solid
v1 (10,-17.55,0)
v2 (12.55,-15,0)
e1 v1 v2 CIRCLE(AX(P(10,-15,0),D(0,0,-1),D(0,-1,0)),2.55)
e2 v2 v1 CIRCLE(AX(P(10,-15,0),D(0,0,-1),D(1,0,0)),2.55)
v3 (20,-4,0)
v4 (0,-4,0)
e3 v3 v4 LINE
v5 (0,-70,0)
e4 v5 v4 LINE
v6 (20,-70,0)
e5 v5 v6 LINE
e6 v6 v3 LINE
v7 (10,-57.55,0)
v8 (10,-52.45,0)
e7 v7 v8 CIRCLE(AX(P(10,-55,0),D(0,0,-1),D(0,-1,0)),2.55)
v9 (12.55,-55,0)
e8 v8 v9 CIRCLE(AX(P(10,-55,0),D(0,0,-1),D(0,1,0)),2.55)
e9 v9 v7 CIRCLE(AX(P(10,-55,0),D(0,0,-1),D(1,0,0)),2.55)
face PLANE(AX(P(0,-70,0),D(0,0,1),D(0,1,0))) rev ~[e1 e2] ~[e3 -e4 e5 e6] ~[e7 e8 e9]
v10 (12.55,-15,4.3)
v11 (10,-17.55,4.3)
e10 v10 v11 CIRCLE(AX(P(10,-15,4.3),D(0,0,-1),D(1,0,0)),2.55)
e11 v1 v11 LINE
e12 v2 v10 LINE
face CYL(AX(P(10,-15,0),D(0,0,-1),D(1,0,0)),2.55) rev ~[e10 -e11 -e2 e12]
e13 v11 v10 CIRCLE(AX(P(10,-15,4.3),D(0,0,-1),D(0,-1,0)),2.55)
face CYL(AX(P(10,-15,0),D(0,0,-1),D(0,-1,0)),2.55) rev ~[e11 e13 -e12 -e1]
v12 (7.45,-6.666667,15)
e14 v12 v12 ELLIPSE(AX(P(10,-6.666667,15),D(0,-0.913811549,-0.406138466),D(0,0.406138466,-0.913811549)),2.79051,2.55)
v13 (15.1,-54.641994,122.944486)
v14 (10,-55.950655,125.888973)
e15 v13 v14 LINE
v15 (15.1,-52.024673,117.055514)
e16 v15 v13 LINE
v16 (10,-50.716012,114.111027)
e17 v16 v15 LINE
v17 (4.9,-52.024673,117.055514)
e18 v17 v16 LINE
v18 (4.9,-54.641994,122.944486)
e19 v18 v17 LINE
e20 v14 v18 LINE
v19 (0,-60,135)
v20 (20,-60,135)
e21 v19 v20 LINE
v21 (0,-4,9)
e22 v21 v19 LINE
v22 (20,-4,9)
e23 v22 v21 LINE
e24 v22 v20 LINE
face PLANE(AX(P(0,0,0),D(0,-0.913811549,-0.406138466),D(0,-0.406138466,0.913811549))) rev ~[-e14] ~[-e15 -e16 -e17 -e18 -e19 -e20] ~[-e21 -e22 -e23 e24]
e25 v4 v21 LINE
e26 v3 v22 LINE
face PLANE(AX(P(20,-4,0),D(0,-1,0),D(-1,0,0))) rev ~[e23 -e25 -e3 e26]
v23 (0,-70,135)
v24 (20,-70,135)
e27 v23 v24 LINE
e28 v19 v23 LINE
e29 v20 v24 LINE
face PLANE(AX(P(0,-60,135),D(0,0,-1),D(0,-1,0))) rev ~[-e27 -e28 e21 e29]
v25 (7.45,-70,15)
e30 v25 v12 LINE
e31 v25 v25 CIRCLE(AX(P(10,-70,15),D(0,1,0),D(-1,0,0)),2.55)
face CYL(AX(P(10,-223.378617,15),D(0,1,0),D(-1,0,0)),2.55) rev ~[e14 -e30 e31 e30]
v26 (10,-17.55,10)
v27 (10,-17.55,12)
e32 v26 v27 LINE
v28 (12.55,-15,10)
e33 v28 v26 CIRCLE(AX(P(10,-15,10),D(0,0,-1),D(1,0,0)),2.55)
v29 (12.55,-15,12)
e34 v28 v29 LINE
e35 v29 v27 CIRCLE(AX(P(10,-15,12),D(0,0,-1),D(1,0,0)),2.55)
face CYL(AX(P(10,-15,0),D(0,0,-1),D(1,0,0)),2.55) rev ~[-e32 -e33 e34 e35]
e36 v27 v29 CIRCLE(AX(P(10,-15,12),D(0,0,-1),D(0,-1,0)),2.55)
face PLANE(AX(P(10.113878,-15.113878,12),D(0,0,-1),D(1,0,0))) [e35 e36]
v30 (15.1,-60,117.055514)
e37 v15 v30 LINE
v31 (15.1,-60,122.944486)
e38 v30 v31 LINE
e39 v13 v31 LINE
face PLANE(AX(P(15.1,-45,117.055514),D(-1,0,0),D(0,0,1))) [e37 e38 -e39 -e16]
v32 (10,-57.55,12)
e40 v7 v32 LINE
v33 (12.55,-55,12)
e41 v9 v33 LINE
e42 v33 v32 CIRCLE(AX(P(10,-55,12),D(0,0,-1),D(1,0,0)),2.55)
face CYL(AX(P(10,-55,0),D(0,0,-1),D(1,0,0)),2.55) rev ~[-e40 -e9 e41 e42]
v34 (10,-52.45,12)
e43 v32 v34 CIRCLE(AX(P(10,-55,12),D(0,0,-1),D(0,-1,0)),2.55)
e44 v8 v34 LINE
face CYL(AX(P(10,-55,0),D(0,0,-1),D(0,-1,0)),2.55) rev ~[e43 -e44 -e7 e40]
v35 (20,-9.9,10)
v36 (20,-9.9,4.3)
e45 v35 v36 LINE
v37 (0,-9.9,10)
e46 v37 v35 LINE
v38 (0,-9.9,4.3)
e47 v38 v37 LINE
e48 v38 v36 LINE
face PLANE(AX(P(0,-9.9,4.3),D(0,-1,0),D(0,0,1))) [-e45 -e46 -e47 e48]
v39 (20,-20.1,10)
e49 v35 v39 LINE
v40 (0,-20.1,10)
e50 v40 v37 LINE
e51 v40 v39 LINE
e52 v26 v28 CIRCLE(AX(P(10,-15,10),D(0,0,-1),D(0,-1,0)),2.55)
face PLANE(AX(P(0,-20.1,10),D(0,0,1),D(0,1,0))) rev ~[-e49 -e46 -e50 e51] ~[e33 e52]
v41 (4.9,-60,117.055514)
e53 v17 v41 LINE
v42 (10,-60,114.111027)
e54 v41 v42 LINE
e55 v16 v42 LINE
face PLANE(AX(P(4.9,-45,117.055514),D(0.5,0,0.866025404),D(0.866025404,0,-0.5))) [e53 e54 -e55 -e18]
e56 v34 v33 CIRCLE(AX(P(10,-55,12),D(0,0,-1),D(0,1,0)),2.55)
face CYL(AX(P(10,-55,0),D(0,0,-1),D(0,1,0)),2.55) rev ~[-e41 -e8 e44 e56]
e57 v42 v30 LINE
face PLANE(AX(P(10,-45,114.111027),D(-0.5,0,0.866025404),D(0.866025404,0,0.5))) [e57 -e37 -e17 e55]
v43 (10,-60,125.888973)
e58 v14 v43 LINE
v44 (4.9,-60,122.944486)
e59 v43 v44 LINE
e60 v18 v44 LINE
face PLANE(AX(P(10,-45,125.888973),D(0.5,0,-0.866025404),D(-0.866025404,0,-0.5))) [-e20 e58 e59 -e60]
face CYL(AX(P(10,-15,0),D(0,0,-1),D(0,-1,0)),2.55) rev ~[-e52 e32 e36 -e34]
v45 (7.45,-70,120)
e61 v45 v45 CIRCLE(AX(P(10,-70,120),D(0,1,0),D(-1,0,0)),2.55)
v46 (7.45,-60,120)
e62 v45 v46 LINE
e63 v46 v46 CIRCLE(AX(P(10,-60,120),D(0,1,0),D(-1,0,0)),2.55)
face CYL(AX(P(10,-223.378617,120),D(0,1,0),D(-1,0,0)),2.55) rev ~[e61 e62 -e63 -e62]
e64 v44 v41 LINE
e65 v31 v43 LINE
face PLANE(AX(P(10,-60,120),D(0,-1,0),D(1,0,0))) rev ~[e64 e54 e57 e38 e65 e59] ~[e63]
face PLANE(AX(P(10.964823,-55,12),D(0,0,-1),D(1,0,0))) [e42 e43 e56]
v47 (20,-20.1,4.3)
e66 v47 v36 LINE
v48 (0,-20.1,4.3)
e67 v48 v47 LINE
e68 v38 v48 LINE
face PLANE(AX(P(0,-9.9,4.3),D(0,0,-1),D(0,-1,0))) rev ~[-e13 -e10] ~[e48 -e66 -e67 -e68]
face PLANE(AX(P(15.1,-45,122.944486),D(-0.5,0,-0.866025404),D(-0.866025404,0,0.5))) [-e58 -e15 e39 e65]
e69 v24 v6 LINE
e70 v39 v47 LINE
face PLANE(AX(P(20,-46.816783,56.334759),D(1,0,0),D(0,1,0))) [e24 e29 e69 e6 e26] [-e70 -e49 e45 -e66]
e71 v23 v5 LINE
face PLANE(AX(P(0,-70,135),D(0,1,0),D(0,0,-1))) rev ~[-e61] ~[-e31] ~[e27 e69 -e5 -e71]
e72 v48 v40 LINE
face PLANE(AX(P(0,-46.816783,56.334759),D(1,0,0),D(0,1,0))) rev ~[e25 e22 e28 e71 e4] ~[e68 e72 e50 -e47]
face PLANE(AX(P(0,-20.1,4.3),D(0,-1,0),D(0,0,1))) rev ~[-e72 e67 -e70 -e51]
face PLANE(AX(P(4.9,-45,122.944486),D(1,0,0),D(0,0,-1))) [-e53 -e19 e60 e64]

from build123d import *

# Parameters (mm, degrees)
F1_DEPTH  = 20
F3_D      = 5.1
F5_DEPTH  = 12
F6_DEPTH  = 25
F7_DEPTH  = 15
F8_D      = 5.1
F9_W      = 5.1
F9_H      = 5.7
F10_DEPTH = 25
F4_W      = 10
F4_H      = 4
F11_DEPTH = 25


# Not quite as in the source:
# - a feature names something its author has since deleted; it is built from what else it names


with BuildPart() as f1:
    # F0 (on Right) → F1 (new body)
    with BuildSketch(Plane.YZ):
        Polygon((-70, 0), (0, 0), (-60, 135), (-70, 135), align=None)
    extrude(amount=F1_DEPTH)

    # F3 (through all)
    with Locations(Plane.XZ.offset(70)):
        with Locations((10, 15), (10, 120)):
            Hole(F3_D / 2)

    # F4 (on face) → F5 (cut)
    with BuildSketch(Plane(origin=(0, 0, 0), x_dir=(1, 0, 0), z_dir=(0, 0, -1))):
        with BuildLine():
            ThreePointArc((12.55, 55), (11.803122292, 56.803122292), (10, 57.55))
            Line((10, 57.55), (10, 55))
            Line((10, 55), (10, 52.45))
            ThreePointArc((10, 52.45), (11.803122292, 53.196877708), (12.55, 55))
        make_face()
        with BuildLine():
            ThreePointArc((12.55, 15), (11.803122292, 16.803122292), (10, 17.55))
            ThreePointArc((10, 17.55), (8.196877708, 13.196877708), (12.55, 15))
        make_face()
        with BuildLine():
            Line((10, 55), (10, 57.55))
            ThreePointArc((10, 57.55), (7.45, 55), (10, 52.45))
            Line((10, 52.45), (10, 55))
        make_face()
    extrude(amount=-F5_DEPTH, mode=Mode.SUBTRACT)

    # F2 (on face) → F6 (join)
    with BuildSketch(Plane.XZ.offset(70)):
        Polygon((15.1, 122.9444863729), (10, 125.8889727457), (4.9, 122.9444863729), (4.9, 117.0555136271), (10, 114.1110272543), (15.1, 117.0555136271), align=None)
    extrude(amount=-F6_DEPTH)

    # F7 (cut): a face of the model
    f7_faces = [f1.faces().sort_by_distance(p)[0] for p in [
        (10, -45, 120),
    ]]
    extrude(f7_faces, amount=-F7_DEPTH, mode=Mode.SUBTRACT)

    # F8 (through all)
    with Locations(Plane.XZ.offset(70)):
        with Locations((10, 120)):
            Hole(F8_D / 2)

    # F9 (on face) → F10 (cut)
    with BuildSketch(Plane(origin=(0, 0, 0), x_dir=(0, -1, 0), z_dir=(-1, 0, 0))):
        with Locations((12.45, 7.15)):
            Rectangle(F9_W, F9_H)
        with Locations((17.55, 7.15)):
            Rectangle(F9_W, F9_H)
    extrude(amount=-F10_DEPTH, mode=Mode.SUBTRACT)

    # F4 (on face) → F11 (cut)
    with BuildSketch(Plane(origin=(0, 0, 0), x_dir=(1, 0, 0), z_dir=(0, 0, -1))):
        with Locations((15, 2)):
            Rectangle(F4_W, F4_H)
        with Locations((5, 2)):
            Rectangle(F4_W, F4_H)
    extrude(amount=-F11_DEPTH, mode=Mode.SUBTRACT)


solid = f1.part
